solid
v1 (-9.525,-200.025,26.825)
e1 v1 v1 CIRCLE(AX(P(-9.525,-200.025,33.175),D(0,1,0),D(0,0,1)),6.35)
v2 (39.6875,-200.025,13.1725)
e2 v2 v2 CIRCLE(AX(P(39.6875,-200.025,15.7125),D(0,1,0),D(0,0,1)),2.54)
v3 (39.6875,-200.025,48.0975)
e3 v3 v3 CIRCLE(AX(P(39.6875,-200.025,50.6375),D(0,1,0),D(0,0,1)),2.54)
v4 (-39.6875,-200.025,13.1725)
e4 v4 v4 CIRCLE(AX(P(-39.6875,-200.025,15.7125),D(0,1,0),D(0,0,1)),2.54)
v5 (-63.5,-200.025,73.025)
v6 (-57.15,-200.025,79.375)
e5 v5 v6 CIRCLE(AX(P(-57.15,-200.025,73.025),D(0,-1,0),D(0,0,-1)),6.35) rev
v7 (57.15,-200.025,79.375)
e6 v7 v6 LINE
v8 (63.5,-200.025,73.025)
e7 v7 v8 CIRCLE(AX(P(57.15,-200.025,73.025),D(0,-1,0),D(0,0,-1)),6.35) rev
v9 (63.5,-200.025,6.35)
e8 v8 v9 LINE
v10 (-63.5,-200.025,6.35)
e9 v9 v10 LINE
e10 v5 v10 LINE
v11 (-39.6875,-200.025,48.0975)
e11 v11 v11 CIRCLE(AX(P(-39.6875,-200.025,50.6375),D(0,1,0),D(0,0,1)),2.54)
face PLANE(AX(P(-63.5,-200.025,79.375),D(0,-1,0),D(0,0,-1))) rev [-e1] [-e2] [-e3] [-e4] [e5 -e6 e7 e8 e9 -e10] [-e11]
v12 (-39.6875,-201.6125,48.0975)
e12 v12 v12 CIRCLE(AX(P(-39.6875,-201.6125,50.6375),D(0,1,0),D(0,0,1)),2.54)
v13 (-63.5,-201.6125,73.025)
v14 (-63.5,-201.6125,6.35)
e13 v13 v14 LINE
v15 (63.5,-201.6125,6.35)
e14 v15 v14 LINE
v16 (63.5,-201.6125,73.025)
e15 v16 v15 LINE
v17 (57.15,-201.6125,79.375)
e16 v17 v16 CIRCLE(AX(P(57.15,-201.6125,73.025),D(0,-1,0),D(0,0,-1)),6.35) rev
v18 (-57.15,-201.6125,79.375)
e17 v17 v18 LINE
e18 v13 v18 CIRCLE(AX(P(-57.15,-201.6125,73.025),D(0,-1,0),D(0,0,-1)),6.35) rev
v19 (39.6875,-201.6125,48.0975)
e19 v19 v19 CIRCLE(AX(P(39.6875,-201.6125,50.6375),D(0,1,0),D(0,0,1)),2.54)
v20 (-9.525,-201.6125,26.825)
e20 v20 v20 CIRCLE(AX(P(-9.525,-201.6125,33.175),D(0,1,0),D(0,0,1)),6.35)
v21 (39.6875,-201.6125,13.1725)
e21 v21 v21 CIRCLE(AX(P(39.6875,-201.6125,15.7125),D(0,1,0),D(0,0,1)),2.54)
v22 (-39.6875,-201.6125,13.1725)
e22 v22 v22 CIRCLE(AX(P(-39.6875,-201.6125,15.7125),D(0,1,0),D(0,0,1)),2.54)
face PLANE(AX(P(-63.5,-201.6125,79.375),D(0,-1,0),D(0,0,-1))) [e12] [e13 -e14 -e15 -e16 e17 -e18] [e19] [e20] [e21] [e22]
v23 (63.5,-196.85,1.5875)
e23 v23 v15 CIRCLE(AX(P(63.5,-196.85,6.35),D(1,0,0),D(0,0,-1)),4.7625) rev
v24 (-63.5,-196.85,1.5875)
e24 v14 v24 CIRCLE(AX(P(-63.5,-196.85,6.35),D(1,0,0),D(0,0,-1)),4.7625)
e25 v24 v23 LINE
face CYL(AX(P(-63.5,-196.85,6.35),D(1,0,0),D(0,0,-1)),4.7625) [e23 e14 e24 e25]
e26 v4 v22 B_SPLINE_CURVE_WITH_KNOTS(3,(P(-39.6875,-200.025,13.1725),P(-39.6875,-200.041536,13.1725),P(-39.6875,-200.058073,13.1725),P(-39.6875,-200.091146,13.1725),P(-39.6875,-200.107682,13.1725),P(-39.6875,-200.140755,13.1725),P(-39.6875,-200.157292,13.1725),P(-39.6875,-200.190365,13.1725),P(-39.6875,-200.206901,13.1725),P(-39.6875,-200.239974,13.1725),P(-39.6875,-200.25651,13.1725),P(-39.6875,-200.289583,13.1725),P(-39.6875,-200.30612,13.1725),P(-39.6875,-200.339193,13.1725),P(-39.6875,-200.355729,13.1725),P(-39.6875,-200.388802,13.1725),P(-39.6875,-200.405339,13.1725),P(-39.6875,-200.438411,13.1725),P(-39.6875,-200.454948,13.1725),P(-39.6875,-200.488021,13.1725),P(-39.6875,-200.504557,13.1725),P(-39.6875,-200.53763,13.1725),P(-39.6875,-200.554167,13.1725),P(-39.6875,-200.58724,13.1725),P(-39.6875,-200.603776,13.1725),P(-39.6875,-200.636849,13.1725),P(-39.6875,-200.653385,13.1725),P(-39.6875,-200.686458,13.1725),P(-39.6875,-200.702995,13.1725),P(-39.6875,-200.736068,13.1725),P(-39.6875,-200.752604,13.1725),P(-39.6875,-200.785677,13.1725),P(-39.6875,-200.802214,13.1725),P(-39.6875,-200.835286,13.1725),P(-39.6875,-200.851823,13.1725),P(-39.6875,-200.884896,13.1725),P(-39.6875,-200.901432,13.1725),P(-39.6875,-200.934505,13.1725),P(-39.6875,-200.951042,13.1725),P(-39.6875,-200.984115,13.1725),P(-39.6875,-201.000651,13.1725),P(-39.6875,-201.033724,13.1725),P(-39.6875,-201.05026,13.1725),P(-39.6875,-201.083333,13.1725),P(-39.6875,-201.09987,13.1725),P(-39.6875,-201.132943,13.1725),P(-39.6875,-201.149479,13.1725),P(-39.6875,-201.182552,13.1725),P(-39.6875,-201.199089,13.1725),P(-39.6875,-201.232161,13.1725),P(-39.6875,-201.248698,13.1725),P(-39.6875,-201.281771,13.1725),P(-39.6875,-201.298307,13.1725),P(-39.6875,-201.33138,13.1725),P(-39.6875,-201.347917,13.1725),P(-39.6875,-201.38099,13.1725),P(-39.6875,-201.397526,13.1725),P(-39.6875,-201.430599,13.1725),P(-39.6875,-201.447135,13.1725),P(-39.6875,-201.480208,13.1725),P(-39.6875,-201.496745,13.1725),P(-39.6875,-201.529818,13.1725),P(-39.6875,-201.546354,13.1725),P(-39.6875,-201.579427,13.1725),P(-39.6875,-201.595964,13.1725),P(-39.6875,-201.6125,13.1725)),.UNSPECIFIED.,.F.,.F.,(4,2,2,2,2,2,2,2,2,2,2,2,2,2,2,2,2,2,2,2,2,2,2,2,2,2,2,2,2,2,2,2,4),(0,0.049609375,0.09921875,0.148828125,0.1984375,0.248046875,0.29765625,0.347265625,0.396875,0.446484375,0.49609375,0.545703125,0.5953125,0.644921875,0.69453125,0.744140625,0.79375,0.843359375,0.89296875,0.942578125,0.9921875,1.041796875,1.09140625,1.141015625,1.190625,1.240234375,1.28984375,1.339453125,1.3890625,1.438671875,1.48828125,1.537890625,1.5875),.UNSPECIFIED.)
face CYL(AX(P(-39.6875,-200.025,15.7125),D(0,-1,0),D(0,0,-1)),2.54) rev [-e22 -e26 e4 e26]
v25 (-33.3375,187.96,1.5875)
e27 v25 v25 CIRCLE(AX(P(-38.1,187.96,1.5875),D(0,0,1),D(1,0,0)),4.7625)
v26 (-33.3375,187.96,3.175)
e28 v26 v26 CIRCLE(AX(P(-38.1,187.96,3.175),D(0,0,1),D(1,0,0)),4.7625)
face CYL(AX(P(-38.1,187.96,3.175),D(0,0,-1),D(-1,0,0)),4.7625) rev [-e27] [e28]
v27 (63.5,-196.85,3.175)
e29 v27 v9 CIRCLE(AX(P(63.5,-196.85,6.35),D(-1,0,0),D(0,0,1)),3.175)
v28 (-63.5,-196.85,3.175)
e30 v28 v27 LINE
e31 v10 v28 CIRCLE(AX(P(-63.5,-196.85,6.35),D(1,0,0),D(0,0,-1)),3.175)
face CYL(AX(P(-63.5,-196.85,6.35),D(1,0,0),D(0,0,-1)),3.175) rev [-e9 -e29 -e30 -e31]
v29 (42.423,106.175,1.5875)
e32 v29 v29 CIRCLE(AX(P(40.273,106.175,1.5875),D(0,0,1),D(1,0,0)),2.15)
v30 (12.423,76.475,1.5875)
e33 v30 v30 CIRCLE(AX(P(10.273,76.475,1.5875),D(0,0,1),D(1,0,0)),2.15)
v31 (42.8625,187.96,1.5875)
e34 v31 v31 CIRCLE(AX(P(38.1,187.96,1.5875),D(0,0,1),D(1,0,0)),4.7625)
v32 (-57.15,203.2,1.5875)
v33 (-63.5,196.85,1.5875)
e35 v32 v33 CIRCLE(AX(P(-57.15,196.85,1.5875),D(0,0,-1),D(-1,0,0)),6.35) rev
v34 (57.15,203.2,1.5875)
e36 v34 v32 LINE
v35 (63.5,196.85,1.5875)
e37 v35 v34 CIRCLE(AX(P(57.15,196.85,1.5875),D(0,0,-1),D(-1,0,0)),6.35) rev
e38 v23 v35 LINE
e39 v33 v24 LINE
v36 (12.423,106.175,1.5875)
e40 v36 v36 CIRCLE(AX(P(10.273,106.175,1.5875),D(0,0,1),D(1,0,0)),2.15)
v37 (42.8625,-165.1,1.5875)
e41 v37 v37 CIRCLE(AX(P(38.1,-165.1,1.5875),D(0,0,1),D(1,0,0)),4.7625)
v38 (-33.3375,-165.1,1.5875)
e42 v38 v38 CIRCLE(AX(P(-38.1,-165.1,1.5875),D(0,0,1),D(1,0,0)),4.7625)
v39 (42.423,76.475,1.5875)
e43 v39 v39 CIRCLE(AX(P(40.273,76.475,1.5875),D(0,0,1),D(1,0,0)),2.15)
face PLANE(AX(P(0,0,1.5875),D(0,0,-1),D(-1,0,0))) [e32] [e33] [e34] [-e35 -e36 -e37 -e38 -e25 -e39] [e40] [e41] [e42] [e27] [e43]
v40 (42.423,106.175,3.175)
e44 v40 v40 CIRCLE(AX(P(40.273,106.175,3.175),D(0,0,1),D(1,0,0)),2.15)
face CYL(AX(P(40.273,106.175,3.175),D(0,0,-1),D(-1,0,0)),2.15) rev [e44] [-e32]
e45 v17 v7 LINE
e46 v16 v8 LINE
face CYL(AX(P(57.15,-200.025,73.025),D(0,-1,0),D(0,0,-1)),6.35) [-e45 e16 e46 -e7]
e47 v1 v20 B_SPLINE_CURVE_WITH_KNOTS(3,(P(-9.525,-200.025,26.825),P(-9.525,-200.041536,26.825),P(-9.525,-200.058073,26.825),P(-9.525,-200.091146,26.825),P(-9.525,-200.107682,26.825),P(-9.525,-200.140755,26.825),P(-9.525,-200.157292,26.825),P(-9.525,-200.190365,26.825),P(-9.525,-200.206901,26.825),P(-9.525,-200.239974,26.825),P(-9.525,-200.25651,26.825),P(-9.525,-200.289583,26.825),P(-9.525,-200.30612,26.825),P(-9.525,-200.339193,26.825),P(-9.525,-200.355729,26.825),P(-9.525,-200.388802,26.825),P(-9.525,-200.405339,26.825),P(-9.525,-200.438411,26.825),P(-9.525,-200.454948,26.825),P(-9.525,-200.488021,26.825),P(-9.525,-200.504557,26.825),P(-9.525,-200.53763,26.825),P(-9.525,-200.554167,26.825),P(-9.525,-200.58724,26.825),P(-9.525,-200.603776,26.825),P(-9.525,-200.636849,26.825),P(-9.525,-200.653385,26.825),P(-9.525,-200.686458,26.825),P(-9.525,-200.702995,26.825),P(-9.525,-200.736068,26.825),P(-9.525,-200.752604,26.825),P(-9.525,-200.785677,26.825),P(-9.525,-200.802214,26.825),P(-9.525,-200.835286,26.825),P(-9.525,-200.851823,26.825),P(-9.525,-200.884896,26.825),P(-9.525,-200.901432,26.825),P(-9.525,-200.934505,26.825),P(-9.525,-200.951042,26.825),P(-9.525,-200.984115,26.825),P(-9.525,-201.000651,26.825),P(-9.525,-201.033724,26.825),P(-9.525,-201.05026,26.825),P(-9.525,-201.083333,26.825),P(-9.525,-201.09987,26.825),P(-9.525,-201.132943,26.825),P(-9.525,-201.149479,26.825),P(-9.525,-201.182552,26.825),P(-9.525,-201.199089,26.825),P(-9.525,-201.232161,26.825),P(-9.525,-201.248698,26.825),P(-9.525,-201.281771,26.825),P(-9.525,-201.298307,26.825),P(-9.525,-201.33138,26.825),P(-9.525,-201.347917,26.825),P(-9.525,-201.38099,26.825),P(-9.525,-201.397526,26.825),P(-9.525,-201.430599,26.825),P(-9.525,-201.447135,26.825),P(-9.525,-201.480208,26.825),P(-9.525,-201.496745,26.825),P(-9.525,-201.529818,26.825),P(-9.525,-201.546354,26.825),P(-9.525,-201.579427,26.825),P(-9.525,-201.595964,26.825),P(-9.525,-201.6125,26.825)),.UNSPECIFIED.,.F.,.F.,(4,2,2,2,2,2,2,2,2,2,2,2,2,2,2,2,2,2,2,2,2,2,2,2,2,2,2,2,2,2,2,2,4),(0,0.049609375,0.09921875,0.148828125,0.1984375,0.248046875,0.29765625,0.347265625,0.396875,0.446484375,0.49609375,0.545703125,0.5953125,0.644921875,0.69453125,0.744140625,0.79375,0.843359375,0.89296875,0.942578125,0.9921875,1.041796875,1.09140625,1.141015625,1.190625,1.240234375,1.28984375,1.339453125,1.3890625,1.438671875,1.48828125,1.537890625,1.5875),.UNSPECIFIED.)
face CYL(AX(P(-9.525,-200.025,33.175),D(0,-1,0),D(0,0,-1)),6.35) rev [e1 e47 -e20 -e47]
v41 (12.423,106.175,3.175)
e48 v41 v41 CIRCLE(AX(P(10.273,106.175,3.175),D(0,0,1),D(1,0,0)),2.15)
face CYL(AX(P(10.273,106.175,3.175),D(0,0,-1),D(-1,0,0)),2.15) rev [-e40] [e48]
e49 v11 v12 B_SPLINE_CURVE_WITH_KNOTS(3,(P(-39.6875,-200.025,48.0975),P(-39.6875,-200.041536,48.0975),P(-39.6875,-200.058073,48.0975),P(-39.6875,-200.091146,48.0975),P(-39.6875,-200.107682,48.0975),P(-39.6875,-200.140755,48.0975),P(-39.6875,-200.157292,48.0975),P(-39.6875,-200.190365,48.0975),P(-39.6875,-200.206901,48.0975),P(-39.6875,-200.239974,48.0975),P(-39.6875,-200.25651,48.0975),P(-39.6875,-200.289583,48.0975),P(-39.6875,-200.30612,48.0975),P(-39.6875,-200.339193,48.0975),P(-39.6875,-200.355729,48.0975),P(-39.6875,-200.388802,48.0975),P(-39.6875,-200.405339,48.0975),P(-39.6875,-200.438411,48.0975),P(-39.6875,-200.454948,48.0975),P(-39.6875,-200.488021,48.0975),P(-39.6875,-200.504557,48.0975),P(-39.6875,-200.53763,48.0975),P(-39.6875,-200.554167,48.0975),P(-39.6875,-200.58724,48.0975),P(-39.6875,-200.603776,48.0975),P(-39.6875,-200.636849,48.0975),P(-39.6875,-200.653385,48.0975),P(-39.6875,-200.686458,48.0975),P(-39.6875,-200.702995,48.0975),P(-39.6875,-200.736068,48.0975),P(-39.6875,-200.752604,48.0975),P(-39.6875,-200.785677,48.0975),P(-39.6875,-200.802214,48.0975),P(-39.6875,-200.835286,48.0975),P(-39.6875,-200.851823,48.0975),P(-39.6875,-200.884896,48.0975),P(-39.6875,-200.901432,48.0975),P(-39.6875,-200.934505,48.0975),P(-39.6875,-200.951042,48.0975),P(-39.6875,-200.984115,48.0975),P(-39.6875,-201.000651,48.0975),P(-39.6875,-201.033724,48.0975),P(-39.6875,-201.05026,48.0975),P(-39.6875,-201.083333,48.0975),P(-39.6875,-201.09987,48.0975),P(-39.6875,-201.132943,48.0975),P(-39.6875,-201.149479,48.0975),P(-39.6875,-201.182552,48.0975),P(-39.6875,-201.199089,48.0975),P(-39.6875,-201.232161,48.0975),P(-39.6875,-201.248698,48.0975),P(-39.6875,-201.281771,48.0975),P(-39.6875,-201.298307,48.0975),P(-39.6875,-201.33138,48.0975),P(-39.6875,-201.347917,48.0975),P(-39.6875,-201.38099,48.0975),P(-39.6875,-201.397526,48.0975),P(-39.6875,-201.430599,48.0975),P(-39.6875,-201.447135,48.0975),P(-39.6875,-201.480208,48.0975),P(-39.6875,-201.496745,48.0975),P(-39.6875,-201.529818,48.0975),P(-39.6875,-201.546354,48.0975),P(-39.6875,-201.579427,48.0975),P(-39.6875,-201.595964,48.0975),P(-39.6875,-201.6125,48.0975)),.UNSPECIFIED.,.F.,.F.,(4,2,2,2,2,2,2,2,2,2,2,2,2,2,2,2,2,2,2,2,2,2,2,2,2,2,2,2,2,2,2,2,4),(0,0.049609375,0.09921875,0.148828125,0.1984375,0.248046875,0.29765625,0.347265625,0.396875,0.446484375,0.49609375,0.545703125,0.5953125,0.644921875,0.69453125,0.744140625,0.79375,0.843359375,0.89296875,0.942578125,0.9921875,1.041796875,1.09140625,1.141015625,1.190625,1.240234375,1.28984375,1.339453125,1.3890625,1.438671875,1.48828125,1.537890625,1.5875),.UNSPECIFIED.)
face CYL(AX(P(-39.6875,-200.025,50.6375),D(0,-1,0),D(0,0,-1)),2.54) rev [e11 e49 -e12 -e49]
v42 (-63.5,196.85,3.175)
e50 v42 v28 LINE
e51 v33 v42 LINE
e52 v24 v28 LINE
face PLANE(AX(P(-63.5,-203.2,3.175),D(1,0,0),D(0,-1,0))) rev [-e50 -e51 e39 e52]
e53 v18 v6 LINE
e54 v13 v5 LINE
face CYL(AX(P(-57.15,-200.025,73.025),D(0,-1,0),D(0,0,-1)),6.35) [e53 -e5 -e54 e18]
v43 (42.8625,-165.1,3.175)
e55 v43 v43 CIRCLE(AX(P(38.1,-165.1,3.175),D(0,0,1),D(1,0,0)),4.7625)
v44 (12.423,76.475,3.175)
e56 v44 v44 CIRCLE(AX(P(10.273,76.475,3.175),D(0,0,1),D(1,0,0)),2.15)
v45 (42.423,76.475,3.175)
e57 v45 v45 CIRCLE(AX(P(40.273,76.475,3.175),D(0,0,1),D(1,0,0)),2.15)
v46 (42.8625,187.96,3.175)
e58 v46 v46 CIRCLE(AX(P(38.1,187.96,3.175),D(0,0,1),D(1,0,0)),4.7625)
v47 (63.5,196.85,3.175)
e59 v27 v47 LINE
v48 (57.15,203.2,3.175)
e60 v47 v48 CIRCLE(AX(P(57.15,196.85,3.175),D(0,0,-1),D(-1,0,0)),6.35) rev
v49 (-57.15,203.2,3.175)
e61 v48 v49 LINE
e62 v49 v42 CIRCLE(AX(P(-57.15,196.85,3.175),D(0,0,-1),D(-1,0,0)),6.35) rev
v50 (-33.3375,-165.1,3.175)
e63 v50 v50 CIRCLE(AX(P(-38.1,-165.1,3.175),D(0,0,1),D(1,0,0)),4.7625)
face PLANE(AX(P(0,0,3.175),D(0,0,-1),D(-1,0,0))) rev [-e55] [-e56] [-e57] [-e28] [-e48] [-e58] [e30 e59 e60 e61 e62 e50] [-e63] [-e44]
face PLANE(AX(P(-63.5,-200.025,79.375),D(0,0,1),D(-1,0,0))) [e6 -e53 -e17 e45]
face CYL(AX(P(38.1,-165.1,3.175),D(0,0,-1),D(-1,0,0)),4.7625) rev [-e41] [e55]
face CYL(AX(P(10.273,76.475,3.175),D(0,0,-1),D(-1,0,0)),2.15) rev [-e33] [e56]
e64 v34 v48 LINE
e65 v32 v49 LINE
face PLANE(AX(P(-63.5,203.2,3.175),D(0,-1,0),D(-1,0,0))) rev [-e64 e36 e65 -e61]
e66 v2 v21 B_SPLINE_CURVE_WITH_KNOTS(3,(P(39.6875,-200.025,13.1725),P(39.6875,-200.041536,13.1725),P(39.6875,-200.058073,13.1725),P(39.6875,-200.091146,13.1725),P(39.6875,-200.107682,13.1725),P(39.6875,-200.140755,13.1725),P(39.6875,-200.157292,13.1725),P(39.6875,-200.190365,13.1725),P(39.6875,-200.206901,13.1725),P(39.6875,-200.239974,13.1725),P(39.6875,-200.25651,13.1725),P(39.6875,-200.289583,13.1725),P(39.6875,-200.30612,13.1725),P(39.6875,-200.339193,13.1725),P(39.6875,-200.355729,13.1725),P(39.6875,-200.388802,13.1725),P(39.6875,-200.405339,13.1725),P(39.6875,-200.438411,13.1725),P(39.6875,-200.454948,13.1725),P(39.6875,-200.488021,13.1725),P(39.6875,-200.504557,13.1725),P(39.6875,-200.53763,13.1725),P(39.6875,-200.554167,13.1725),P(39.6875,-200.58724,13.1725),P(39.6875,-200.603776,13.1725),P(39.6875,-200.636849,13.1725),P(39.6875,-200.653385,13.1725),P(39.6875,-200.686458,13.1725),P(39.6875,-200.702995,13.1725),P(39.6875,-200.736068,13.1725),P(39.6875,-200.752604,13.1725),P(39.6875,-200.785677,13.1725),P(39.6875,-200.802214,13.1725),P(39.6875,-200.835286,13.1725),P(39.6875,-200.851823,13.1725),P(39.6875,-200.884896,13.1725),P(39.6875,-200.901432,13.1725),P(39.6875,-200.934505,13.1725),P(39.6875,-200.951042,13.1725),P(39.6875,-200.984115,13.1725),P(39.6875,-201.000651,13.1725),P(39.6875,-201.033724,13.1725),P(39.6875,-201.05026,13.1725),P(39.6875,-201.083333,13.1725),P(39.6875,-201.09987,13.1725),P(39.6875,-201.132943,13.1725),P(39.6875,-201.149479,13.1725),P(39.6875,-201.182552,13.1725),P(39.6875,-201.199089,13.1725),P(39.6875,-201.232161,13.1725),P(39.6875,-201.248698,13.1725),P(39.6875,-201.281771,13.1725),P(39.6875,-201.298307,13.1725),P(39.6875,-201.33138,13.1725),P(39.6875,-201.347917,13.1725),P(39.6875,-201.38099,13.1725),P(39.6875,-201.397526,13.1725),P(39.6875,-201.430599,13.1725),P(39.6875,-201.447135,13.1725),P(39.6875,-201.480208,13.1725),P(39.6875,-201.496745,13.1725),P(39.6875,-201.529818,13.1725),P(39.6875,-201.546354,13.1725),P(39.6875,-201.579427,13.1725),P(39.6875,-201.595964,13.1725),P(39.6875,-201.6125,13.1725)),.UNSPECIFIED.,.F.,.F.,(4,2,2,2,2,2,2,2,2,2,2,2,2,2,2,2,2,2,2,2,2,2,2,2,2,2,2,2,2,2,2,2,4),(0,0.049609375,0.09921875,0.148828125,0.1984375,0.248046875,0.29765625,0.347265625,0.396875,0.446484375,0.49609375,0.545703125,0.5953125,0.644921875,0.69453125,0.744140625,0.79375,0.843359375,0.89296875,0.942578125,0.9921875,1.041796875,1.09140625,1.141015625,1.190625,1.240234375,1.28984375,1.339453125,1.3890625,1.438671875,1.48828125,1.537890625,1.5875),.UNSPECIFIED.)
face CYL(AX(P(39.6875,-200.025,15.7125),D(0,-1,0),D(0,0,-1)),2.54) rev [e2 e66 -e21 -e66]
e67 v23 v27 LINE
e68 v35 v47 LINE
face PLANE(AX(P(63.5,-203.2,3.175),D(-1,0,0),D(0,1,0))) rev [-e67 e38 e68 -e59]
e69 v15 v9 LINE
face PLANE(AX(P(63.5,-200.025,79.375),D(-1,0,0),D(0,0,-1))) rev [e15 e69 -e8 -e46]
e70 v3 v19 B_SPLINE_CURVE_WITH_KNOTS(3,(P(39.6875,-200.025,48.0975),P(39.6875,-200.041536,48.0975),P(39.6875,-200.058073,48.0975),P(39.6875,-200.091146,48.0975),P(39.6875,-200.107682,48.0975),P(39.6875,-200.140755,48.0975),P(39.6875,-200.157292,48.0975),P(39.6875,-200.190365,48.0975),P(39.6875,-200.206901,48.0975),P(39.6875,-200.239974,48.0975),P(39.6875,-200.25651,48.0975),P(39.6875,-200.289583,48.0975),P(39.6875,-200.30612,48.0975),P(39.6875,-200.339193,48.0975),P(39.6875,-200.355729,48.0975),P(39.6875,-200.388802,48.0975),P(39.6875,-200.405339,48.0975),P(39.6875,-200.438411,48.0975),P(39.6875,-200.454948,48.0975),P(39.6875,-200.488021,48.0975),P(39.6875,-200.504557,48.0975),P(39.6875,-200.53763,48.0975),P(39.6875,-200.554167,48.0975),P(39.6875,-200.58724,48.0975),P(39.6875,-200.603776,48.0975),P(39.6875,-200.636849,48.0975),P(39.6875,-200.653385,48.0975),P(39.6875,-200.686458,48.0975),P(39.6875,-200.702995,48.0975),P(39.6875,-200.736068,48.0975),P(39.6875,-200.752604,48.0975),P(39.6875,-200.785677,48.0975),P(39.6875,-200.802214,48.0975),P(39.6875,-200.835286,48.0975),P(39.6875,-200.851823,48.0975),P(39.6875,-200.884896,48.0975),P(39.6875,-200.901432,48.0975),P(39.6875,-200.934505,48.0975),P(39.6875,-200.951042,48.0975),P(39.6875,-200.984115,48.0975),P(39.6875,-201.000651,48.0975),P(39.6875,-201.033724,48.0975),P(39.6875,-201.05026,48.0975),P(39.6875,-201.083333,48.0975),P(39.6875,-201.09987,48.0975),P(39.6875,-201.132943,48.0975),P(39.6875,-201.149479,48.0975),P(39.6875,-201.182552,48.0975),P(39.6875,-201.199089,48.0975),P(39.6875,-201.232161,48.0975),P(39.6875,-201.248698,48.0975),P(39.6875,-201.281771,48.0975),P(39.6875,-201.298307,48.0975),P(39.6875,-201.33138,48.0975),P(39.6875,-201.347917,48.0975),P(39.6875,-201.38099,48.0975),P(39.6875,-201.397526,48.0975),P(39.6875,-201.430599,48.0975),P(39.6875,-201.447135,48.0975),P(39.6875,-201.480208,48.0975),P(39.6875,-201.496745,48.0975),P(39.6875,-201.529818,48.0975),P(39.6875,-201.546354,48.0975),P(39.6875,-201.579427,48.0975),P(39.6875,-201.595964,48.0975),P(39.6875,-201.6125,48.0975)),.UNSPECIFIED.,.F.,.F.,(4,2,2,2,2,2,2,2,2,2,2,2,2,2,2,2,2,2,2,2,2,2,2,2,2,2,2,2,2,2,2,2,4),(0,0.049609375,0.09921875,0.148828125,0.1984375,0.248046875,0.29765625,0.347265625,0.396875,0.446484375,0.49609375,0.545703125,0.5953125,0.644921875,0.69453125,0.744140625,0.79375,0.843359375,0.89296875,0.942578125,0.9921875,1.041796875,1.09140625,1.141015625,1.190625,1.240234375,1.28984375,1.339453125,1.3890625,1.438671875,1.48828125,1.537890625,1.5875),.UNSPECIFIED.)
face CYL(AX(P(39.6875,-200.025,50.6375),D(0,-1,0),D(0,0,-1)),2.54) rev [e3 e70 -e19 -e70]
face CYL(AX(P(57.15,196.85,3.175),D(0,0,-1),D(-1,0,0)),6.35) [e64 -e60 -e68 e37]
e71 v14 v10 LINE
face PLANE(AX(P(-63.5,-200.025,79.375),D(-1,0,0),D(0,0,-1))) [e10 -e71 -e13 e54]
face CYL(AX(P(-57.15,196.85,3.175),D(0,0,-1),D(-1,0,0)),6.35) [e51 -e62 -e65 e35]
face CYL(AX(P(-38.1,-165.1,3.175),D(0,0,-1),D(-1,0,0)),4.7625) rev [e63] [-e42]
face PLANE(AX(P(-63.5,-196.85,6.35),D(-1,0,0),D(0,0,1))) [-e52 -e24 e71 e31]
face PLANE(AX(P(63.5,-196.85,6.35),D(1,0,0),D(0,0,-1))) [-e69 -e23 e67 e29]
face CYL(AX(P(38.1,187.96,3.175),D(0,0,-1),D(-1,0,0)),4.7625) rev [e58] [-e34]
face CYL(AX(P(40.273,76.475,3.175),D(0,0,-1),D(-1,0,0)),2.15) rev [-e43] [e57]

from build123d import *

# Parameters (mm, degrees)
SKETCH2_W            = 127
SKETCH2_H            = 406.4
BOSS_EXTRUDE1_DEPTH  = 3.175
SKETCH3_W            = 127
SKETCH3_H            = 3.175
BOSS_EXTRUDE2_DEPTH  = 76.2
FILLET1_R            = 3.175
FILLET2_R            = 6.35
SKETCH4_R            = 6.35
SKETCH4_R_2          = 2.54
CUT_EXTRUDE1_DEPTH   = 416.840163104
SKETCH5_R            = 2.15
SKETCH5_R_2          = 4.7625
CUT_EXTRUDE2_DEPTH   = 227.117071448
CONVERT_SOLID1_START = -63.5
CONVERT_SOLID1_DEPTH = 127


# Read off the part's stored shape, not the designer's step: Convert-Solid1
with BuildPart() as part:
    # Sketch2 → Boss-Extrude1 (new body)
    with BuildSketch(Plane.XY):
        Rectangle(SKETCH2_W, SKETCH2_H)
    extrude(amount=BOSS_EXTRUDE1_DEPTH)

    # Sketch3 → Boss-Extrude2 (add)
    with BuildSketch(Plane.XY.offset(3.175)):
        with Locations((0, -201.6125)):
            Rectangle(SKETCH3_W, SKETCH3_H)
    extrude(amount=BOSS_EXTRUDE2_DEPTH)

    # Fillet1
    fillet1_edges = [part.edges().sort_by_distance(p)[0] for p in [
        (0, -200.025, 3.175),
        (0, -203.2, 0),
    ]]
    fillet(fillet1_edges, radius=FILLET1_R)

    # Fillet2
    fillet2_edges = [part.edges().sort_by_distance(p)[0] for p in [
        (-63.5, -201.6125, 79.375),
        (63.5, -201.6125, 79.375),
        (-63.5, 203.2, 1.5875),
        (63.5, 203.2, 1.5875),
    ]]
    fillet(fillet2_edges, radius=FILLET2_R)

    # Sketch4 → Cut-Extrude1 (cut, through all)
    with BuildSketch(Plane(origin=(0, -200.025, 0), x_dir=(1, 0, 0), z_dir=(0, 1, 0))):
        with Locations(Location((-9.525, -33.175, 0), (0, 0, 270))):
            Circle(SKETCH4_R)
        with Locations(Location((-39.6875, -15.7125, 0), (0, 0, 270))):
            Circle(SKETCH4_R_2)
        with Locations(Location((-39.6875, -50.6375, 0), (0, 0, 270))):
            Circle(SKETCH4_R_2)
        with Locations(Location((39.6875, -15.7125, 0), (0, 0, 270))):
            Circle(SKETCH4_R_2)
        with Locations(Location((39.6875, -50.6375, 0), (0, 0, 270))):
            Circle(SKETCH4_R_2)
    extrude(amount=-CUT_EXTRUDE1_DEPTH, mode=Mode.SUBTRACT)

    # Sketch5 → Cut-Extrude2 (cut, through all)
    with BuildSketch(Plane.XY.offset(3.175)):
        with Locations((10.273, 76.475)):
            Circle(SKETCH5_R)
        with Locations((40.273, 76.475)):
            Circle(SKETCH5_R)
        with Locations((40.273, 106.175)):
            Circle(SKETCH5_R)
        with Locations((10.273, 106.175)):
            Circle(SKETCH5_R)
        with Locations((-38.1, 187.96)):
            Circle(SKETCH5_R_2)
        with Locations((38.1, 187.96)):
            Circle(SKETCH5_R_2)
        with Locations((-38.1, -165.1)):
            Circle(SKETCH5_R_2)
        with Locations((38.1, -165.1)):
            Circle(SKETCH5_R_2)
    extrude(amount=-CUT_EXTRUDE2_DEPTH, mode=Mode.SUBTRACT)

    # Convert-Solid1 outline → Convert-Solid1 (cut)
    with BuildSketch(Plane.YZ.offset(CONVERT_SOLID1_START)):
        with BuildLine():
            ThreePointArc((-196.85, 1.5875), (-200.217596045, 2.982403955), (-201.6125, 6.35))
            Line((-201.6125, 6.35), (-201.6125, 79.375))
            Line((-201.6125, 79.375), (-203.2, 79.375))
            Line((-203.2, 79.375), (-203.2, 3.175))
            ThreePointArc((-203.2, 3.175), (-202.27006403, 0.92993597), (-200.025, 0))
            Line((-200.025, 0), (203.2, 0))
            Line((203.2, 0), (203.2, 1.5875))
            Line((203.2, 1.5875), (-196.85, 1.5875))
        make_face()
    extrude(amount=CONVERT_SOLID1_DEPTH, mode=Mode.SUBTRACT)


solid = part.part
